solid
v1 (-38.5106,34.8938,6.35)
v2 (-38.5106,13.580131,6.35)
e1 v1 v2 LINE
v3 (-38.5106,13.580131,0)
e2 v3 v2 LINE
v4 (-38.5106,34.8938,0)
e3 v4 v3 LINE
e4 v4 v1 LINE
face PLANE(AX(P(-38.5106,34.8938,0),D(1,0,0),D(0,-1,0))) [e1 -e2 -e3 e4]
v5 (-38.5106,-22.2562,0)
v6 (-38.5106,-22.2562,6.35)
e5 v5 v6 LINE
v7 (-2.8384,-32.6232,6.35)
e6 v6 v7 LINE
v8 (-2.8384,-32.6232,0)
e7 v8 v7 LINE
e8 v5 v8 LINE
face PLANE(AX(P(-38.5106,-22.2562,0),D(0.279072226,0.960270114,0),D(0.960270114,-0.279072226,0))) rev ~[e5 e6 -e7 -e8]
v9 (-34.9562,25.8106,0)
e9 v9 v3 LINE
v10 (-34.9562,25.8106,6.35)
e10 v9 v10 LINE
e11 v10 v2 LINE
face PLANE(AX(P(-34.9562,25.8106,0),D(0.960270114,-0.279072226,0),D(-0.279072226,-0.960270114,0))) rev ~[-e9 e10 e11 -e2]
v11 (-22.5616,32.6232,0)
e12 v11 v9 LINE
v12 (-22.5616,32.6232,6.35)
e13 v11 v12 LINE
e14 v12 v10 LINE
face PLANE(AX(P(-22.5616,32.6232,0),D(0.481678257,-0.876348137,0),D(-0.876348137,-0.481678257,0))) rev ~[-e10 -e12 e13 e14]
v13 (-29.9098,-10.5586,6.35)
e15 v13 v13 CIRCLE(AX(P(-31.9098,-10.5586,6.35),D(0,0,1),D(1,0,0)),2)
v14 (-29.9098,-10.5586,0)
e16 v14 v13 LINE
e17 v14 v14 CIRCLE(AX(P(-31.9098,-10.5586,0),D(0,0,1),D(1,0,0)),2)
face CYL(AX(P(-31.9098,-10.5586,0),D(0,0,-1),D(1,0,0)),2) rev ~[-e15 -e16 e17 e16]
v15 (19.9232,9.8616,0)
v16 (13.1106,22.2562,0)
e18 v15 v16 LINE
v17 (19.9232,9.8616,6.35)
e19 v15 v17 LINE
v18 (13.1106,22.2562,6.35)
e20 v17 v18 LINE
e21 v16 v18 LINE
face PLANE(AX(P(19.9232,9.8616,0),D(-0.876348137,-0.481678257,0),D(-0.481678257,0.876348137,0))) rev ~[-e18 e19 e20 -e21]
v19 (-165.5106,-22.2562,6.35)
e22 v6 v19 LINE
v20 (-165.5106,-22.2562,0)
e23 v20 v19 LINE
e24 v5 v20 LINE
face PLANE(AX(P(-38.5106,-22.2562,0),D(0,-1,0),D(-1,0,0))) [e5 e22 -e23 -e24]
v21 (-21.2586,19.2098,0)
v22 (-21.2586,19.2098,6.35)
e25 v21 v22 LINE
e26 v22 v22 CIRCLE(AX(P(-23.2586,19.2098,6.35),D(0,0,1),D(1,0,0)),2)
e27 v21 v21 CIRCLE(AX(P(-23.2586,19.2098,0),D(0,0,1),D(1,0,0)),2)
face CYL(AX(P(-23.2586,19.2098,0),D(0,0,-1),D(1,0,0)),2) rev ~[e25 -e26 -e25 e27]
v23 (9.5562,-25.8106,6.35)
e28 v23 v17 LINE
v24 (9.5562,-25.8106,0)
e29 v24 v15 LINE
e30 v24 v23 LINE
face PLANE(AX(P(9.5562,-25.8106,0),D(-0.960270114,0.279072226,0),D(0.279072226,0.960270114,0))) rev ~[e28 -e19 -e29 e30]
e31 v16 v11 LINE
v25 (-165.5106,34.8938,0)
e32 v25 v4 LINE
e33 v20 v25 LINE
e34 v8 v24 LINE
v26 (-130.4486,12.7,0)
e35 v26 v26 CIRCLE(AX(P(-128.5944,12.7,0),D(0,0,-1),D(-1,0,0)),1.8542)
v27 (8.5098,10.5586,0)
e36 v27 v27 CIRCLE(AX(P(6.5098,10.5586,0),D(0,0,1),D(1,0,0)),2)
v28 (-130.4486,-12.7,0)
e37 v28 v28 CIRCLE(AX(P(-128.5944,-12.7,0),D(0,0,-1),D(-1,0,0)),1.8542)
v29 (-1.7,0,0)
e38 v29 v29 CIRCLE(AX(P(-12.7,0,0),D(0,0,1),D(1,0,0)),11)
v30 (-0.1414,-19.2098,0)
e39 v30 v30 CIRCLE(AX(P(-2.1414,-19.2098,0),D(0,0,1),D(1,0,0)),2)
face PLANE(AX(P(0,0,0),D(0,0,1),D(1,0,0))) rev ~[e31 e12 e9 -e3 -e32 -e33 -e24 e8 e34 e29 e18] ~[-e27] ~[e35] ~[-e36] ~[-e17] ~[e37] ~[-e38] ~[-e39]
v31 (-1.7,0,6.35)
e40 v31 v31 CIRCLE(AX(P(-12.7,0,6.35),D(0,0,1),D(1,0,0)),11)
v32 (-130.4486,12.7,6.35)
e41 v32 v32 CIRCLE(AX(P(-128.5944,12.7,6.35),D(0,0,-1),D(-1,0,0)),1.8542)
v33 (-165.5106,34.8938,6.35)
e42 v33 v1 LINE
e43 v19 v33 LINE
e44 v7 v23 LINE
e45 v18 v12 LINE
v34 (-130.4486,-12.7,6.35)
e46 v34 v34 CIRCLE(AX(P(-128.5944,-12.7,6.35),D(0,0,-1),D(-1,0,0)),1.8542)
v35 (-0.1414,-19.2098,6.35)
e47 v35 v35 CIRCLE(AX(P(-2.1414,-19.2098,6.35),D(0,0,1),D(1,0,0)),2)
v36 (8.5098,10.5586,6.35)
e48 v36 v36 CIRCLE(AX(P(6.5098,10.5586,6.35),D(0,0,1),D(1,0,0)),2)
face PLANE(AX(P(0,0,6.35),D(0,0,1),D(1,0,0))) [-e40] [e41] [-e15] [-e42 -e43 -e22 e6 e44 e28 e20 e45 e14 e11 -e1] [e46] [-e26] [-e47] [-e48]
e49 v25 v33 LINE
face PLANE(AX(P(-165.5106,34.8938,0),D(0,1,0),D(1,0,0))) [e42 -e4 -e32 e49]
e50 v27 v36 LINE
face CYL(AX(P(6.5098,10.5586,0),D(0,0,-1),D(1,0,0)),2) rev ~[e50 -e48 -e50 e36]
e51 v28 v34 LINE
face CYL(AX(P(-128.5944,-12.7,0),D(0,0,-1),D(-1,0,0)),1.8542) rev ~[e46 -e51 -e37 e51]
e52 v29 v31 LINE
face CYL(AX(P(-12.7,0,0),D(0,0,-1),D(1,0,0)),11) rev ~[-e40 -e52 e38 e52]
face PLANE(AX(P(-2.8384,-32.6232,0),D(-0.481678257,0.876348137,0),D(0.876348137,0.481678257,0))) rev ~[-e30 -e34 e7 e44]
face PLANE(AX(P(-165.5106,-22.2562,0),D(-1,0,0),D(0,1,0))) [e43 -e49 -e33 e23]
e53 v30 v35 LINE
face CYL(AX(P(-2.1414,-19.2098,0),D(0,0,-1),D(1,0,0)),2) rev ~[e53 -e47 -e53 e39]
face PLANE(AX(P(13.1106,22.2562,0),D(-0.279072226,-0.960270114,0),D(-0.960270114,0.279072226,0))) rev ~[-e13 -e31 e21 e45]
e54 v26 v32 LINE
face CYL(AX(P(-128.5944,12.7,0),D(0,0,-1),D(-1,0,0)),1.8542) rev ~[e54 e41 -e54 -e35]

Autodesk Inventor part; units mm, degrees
ref_plane "YZ Plane" through (0, 0, 0) normal (1, 0, 0) x (0, 1, 0)
ref_plane "XZ Plane" through (0, 0, 0) normal (0, 1, 0) x (-1, 0, 0)
ref_plane "XY Plane" through (0, 0, 0) normal (0, 0, 1) x (1, 0, 0)
sketch "Sketch1" plane through (0, 0, 0) normal (0, 0, 1) x (1, 0, 0)
  circle A0 centre (-2.1414, -19.2098) radius 2 projected
  circle A1 centre (-31.9098, -10.5586) radius 2 projected
  circle A2 centre (6.5098, 10.5586) radius 2 projected
  circle A3 centre (-23.2586, 19.2098) radius 2 projected
  line L0 (-28.6845, 20.7851) -> (-21.6804, 24.6349) projected
  line L1 (-21.6804, 24.6349) -> (8.0851, 15.9845) projected
  line L2 (8.0851, 15.9845) -> (11.9349, 8.9804) projected
  line L3 (11.9349, 8.9804) -> (3.2845, -20.7851) projected
  line L4 (3.2845, -20.7851) -> (-3.7196, -24.6349) projected
  line L5 (-3.7196, -24.6349) -> (-33.4851, -15.9845) projected
  line L6 (-33.4851, -15.9845) -> (-37.3349, -8.9804) projected
  line L7 (-37.3349, -8.9804) -> (-28.6845, 20.7851) projected
  line L8 (9.5562, -25.8106) -> (19.9232, 9.8616)
  line L9 (19.9232, 9.8616) -> (13.1106, 22.2562)
  line L10 (13.1106, 22.2562) -> (-22.5616, 32.6232)
  line L11 (-22.5616, 32.6232) -> (-34.9562, 25.8106)
  line L12 (-34.9562, 25.8106) -> (-45.3232, -9.8616)
  line L13 (-45.3232, -9.8616) -> (-38.5106, -22.2562)
  line L14 (-38.5106, -22.2562) -> (-2.8384, -32.6232)
  line L15 (-2.8384, -32.6232) -> (9.5562, -25.8106)
  line L16 (-38.5106, -22.2562) -> (-165.5106, -22.2562)
  line L17 (-165.5106, -22.2562) -> (-165.5106, 34.8938)
  line L18 (-165.5106, 34.8938) -> (-38.5106, 34.8938)
  line L19 (-38.5106, 34.8938) -> (-38.5106, -22.2562)
  circle A4 centre (-12.7, 0) radius 11 projected
  point P0 (0, 0)
  dimension "d0" = 127
  dimension "d1" = 57.15
  dimension "d2" = 57.15
extrude "Extrusion1" add sketch "Sketch1" along normal blind 6.35 contours L0 L1 L2 L3 L4 L5 L6 L7 | L15 L14 L19 L12 L11 L10 L9 L8 | L16 L17 L18 L19 L12 L13 | L13 L12 L19
sketch "Sketch2" plane through (0, 0, 0) normal (0, 0, -1) x (-1, 0, 0)
  line L0 (136.7986, -16.3493) -> (136.7986, -9.9993) projected
  line L1 (133.0902, -9.9993) -> (133.0902, -16.3493) projected
  line L2 (136.7986, 9.0507) -> (136.7986, 15.4007) projected
  line L3 (133.0902, 15.4007) -> (133.0902, 9.0507) projected
  line L4 (126.7402, -12.7) -> (130.4486, -12.7) construction
  line L5 (126.7402, 12.7) -> (130.4486, 12.7) construction
  circle A0 centre (128.5944, -12.7) radius 1.8542
  circle A1 centre (128.5944, 12.7) radius 1.8542
  dimension "d5" = 3.7084
  dimension "d6" = 3.7084
extrude "Extrusion2" cut sketch "Sketch2" against normal through all
sketch "Sketch3" plane through (0, 0, 0) normal (0, 0, -1) x (-1, 0, 0)
  line L0 (165.5106, 34.8938) -> (165.5106, -22.2562) projected
  line L1 (153.1125, 15.7309) -> (159.2102, 17.5031) projected
  line L2 (170.3558, -20.8481) -> (159.2102, 17.5031) projected
  line L3 (2.8384, -32.6232) -> (155.6197, 11.7778) projected
  line L4 (-9.5562, -25.8106) -> (2.8384, -32.6232) projected
  line L5 (-19.9232, 9.8616) -> (-9.5562, -25.8106) projected
  line L6 (-13.1106, 22.2562) -> (-19.9232, 9.8616) projected
  line L7 (154.986, 71.1081) -> (-13.1106, 22.2562) projected
  line L8 (145.7706, 63.7481) -> (155.0405, 31.851) projected
  line L9 (145.7706, 63.7481) -> (139.6729, 61.976) projected
  line L10 (139.6729, 61.976) -> (139.0916, 63.9761) projected
  line L11 (139.0916, 63.9761) -> (136.4086, 63.1964) projected
  line L12 (136.4086, 63.1964) -> (136.9899, 61.1963) projected
  line L13 (136.9899, 61.1963) -> (133.5752, 60.2039) projected
  line L14 (133.5752, 60.2039) -> (134.6101, 56.6429) projected
  line L15 (134.6101, 56.6429) -> (138.0248, 57.6352) projected
  line L16 (138.0248, 57.6352) -> (138.606, 55.6352) projected
  line L17 (138.606, 55.6352) -> (141.289, 56.4149) projected
  line L18 (141.289, 56.4149) -> (140.7078, 58.415) projected
  line L19 (140.7078, 58.415) -> (146.8055, 60.1871) projected
  line L20 (158.1753, 21.0641) -> (146.8055, 60.1871) projected
  line L21 (158.1753, 21.0641) -> (152.0776, 19.292) projected
  line L22 (152.0776, 19.292) -> (151.4964, 21.2921) projected
  line L23 (151.4964, 21.2921) -> (148.8134, 20.5123) projected
  line L24 (148.8134, 20.5123) -> (149.3946, 18.5123) projected
  line L25 (149.3946, 18.5123) -> (145.9799, 17.5199) projected
  line L26 (145.9799, 17.5199) -> (147.0148, 13.9588) projected
  line L27 (147.0148, 13.9588) -> (150.4295, 14.9512) projected
  line L28 (150.4295, 14.9512) -> (151.0108, 12.9512) projected
  line L29 (151.0108, 12.9512) -> (153.6938, 13.7309) projected
  line L30 (153.6938, 13.7309) -> (153.1125, 15.7309) projected
  circle A0 centre (132.6412, 48.0825) radius 1.8542 projected
  circle A1 centre (139.7296, 23.6916) radius 1.8542 projected
  circle A2 centre (2.1414, -19.2098) radius 2 projected
  circle A3 centre (31.9098, -10.5586) radius 2 projected
  circle A4 centre (-6.5098, 10.5586) radius 2 projected
  circle A5 centre (23.2586, 19.2098) radius 2 projected
  circle A6 centre (12.7, 0) radius 11 projected
  point P0 (165.5106, -22.2562)
extrude "Extrusion3" [suppressed]
equation "\"d2\" = d1"
properties part number "tiltColumnStepperSide02" material "Gold"
